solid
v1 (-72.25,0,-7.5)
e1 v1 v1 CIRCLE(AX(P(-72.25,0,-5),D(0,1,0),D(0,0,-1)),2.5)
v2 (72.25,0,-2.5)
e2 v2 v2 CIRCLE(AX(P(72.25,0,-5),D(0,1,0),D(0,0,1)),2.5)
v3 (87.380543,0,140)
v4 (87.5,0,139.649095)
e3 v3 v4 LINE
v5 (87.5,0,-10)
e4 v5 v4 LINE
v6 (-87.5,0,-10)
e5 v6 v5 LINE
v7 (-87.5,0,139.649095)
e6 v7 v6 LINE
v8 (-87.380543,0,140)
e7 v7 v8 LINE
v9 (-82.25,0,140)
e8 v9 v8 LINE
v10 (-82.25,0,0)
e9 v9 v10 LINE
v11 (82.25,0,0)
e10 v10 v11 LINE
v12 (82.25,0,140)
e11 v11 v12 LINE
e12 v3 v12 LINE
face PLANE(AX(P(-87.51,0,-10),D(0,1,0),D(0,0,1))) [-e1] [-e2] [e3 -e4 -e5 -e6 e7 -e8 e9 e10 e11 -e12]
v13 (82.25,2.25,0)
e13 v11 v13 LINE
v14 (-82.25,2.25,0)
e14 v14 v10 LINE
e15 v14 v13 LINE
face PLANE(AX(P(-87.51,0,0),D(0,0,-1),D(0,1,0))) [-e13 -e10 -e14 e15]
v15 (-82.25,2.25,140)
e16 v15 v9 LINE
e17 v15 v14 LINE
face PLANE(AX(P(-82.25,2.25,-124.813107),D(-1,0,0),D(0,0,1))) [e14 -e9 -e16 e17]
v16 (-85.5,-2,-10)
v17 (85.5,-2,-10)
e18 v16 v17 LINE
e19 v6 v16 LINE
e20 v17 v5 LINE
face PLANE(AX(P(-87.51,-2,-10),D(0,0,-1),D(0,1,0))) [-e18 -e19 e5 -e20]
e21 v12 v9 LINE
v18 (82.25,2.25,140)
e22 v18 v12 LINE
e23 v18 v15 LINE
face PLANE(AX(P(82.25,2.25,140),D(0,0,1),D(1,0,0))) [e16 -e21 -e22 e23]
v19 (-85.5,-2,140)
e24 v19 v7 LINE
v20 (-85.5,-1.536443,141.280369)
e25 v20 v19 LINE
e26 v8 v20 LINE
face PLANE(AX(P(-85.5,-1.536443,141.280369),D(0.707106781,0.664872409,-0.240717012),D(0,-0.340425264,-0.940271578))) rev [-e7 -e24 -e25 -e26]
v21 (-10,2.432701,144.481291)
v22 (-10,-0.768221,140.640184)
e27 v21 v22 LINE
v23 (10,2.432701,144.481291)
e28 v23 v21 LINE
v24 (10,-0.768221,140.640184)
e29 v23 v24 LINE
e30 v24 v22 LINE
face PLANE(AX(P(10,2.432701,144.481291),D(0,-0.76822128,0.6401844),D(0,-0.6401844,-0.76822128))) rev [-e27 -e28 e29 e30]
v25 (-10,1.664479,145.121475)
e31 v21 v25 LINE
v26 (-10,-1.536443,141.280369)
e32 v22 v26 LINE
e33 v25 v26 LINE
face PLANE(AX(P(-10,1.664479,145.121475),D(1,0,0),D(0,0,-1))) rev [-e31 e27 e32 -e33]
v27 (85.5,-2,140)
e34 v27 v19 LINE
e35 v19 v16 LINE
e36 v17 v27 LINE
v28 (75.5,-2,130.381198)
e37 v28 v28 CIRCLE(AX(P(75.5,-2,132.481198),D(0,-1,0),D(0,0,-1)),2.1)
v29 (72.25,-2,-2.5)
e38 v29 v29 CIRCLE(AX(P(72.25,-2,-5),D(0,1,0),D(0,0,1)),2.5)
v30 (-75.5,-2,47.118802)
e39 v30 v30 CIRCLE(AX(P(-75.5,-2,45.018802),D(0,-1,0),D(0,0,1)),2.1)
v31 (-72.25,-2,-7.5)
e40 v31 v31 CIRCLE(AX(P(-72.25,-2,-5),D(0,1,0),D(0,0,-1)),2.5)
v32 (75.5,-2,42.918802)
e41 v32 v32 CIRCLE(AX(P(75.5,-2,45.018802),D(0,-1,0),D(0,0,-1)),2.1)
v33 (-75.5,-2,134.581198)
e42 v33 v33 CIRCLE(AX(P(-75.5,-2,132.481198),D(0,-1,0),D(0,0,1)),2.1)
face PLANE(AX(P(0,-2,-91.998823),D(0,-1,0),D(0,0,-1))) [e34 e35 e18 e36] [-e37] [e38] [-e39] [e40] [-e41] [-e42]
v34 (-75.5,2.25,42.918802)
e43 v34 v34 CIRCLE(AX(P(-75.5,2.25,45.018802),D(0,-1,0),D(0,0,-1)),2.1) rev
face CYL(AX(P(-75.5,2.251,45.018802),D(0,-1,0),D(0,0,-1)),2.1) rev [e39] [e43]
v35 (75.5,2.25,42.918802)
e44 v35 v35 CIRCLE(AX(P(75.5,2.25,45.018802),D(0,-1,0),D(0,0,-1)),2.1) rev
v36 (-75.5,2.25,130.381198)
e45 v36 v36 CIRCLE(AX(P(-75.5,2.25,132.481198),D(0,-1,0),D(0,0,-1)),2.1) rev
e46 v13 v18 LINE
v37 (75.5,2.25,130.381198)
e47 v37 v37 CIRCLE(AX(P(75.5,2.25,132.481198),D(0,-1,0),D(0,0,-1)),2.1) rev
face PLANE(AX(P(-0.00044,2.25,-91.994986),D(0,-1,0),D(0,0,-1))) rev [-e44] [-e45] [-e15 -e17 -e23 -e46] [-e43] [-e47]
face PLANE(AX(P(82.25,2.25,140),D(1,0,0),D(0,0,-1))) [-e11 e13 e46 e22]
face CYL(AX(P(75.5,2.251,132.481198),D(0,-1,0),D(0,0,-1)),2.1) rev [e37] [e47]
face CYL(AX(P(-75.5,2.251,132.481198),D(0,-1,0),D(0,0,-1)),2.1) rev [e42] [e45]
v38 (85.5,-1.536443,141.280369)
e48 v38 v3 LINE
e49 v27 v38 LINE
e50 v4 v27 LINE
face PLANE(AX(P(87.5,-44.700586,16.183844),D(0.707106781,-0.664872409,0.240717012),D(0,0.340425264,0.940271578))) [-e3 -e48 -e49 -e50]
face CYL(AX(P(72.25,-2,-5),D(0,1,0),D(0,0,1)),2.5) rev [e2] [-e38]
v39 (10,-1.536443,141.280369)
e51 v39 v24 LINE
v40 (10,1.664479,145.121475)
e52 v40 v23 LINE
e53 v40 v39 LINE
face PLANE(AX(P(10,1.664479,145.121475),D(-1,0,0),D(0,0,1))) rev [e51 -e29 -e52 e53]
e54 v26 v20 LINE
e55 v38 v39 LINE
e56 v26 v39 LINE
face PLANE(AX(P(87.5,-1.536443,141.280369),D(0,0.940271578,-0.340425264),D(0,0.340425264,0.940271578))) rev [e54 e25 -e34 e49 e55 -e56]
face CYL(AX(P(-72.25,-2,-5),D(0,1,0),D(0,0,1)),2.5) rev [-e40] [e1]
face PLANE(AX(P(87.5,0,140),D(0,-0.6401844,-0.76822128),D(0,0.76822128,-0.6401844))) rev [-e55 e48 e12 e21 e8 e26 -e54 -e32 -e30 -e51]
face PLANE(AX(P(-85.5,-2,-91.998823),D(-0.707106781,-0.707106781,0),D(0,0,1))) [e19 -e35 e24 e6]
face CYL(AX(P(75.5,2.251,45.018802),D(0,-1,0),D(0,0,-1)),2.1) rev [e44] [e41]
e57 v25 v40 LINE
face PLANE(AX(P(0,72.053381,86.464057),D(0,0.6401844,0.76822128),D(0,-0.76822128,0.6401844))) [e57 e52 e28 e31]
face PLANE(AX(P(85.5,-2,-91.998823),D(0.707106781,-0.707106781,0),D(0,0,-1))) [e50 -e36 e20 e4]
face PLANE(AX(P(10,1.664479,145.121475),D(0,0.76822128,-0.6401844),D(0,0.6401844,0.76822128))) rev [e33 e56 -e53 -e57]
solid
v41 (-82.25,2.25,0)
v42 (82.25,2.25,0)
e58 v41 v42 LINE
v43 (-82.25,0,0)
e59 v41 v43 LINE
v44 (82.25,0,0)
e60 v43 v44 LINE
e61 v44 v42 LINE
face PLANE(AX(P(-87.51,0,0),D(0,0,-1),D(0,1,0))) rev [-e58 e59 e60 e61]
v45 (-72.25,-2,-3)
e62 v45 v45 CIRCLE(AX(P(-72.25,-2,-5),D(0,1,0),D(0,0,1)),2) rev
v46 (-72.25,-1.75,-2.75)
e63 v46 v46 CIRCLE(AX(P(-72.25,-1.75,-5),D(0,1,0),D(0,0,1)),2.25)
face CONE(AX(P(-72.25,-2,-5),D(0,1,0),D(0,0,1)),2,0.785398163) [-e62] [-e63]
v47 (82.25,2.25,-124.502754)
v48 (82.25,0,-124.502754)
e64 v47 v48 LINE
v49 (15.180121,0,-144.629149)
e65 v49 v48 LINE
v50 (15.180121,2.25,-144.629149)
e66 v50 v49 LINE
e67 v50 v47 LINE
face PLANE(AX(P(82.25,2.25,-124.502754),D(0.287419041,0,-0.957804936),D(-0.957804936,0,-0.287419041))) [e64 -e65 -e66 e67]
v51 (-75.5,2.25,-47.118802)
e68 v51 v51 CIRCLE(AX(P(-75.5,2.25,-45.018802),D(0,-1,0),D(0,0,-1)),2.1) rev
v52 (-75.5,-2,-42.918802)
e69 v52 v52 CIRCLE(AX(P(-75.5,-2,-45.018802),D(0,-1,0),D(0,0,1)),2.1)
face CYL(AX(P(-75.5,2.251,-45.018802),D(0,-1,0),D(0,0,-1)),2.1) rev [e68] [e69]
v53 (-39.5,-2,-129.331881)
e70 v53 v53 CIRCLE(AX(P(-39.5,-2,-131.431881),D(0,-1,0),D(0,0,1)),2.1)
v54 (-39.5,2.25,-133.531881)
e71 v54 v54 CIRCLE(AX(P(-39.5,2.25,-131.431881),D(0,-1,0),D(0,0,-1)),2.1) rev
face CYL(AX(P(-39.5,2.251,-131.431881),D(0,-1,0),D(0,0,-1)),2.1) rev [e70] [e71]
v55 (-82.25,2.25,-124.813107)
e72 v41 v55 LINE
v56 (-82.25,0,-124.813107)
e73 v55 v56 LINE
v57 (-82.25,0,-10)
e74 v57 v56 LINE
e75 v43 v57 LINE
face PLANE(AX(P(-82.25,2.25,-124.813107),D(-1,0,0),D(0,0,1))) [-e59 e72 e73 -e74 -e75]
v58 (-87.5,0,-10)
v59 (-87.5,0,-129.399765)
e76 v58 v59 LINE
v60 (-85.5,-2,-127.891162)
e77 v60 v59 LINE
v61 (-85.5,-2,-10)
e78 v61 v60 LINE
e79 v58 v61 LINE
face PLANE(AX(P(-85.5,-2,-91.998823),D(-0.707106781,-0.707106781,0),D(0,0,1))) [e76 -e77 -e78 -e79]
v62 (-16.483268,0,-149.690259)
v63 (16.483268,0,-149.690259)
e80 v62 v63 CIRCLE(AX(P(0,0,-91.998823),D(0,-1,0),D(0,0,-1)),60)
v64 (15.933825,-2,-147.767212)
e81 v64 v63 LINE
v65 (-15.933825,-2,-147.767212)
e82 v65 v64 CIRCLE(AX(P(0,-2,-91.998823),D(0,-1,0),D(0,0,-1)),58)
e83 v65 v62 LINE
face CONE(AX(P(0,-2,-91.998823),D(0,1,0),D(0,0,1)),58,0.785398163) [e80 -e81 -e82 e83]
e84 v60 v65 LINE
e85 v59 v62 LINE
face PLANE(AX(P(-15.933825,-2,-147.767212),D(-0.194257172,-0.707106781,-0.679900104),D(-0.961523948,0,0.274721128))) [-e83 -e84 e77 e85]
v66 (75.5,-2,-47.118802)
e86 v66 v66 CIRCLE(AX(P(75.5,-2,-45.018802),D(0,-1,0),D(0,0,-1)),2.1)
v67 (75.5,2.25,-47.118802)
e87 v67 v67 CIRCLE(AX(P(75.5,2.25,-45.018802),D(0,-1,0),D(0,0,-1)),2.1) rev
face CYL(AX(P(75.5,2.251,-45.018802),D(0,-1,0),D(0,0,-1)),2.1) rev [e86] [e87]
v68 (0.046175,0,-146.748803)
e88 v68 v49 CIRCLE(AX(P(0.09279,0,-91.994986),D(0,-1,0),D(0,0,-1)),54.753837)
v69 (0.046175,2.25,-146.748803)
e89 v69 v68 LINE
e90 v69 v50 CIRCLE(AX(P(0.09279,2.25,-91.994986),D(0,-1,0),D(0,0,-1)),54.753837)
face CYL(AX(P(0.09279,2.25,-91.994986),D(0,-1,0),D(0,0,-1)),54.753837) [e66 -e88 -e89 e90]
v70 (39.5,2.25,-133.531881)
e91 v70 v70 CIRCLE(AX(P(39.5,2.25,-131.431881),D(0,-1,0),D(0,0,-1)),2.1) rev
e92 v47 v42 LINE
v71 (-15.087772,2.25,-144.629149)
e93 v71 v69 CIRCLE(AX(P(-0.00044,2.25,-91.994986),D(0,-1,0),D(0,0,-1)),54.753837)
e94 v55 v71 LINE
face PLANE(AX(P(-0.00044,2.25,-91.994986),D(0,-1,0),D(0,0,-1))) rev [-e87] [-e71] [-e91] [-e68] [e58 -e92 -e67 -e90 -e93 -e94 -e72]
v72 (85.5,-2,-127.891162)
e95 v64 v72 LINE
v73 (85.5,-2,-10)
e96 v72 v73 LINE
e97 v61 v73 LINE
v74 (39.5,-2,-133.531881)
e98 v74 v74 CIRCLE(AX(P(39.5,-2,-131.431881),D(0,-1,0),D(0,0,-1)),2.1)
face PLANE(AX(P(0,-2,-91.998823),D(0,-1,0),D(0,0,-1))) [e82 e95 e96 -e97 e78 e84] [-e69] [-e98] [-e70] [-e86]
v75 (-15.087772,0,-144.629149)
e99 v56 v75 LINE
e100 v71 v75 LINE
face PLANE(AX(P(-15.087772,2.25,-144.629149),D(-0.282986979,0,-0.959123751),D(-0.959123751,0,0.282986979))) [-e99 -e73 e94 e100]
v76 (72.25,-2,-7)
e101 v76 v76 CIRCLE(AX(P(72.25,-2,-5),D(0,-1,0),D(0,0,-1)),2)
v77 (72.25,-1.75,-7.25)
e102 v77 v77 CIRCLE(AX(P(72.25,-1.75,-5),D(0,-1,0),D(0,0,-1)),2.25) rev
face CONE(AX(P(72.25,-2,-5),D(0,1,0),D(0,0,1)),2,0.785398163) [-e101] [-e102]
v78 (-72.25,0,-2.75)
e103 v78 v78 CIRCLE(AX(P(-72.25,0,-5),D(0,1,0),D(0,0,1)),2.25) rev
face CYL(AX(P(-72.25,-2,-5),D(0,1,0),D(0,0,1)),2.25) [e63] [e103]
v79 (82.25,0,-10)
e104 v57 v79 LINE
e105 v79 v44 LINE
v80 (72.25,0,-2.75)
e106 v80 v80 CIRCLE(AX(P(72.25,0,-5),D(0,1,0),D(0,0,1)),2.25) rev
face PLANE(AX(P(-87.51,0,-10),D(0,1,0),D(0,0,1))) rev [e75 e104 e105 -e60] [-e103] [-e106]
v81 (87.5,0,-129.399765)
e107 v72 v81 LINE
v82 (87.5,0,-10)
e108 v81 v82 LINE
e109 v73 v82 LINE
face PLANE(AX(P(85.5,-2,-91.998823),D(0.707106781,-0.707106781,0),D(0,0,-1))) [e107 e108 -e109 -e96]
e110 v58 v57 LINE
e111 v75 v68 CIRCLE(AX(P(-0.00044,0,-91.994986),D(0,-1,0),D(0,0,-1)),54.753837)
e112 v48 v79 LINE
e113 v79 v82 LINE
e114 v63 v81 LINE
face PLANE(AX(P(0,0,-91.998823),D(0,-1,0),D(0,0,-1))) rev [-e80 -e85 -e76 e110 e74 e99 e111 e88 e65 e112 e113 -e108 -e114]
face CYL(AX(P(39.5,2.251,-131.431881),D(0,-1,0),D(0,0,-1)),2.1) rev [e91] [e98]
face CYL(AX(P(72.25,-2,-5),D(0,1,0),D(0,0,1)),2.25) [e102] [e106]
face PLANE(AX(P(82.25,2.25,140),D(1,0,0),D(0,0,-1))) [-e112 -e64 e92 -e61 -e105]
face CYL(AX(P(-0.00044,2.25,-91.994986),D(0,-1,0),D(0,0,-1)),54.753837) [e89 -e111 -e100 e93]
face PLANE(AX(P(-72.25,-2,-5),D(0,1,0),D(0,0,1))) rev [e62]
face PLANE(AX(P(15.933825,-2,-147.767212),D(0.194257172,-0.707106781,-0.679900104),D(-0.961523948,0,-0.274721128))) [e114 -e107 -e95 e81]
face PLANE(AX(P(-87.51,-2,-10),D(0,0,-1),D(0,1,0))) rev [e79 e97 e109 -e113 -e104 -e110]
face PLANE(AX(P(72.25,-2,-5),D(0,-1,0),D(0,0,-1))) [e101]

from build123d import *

# Parameters (mm, degrees)
BOSS_EXTRUDE1_DEPTH      = 2.25
BOSS_EXTRUDE2_DEPTH      = 2
CHAMFER1_SIZE            = 2
CUT_EXTRUDE1_REACH       = 177.436
SKETCH5_R                = 2.1
SPLIT1_SURFACE_1_BACK    = 341.45
SPLIT1_SURFACE_1_DEPTH   = 682.9
SPLIT1_SURFACE_2_BACK    = 341.45
SPLIT1_SURFACE_2_DEPTH   = 682.9
SKETCH7_R                = 2.25
BOSS_EXTRUDE3_DEPTH      = 2
CHAMFER2_SIZE            = 0.25
SKETCH9_R                = 2.5
CUT_EXTRUDE2_DEPTH       = 2
BOSS_EXTRUDE5_DEPTH      = 87.5
BOSS_EXTRUDE5_DEPTH_BACK = 87.5
CHAMFER3_SIZE            = 2
SKETCH13_W               = 20
SKETCH13_H               = 1
BOSS_EXTRUDE6_DEPTH      = 5


# Some blends are built 0.0001 mm under size
with BuildPart() as part:
    # Sketch3 → Boss-Extrude1 (new body)
    with BuildSketch(Plane.XZ):
        with BuildLine():
            Line((82.25, 140), (82.25, -124.502754064))
            Line((82.25, -124.502754064), (15.180121042, -144.629148882))
            ThreePointArc((15.180121042, -144.629148882), (7.687460253, -146.219552794), (0.046174732, -146.748803111))
            ThreePointArc((0.046174732, -146.748803111), (-7.595110788, -146.219552794), (-15.087771577, -144.629148882))
            Line((-15.087771577, -144.629148882), (-82.25, -124.813107271))
            Line((-82.25, -124.813107271), (-82.25, 140))
            Line((-82.25, 140), (82.25, 140))
        make_face()
    extrude(amount=-BOSS_EXTRUDE1_DEPTH)

    # Sketch4 → Boss-Extrude2 (add)
    with BuildSketch(Plane.XZ):
        with BuildLine():
            Line((87.5, 140), (-87.5, 140))
            Line((-87.5, 140), (-87.5, -129.399764523))
            Line((-87.5, -129.399764523), (-16.483267674, -149.690259473))
            ThreePointArc((-16.483267674, -149.690259473), (0, -151.998822615), (16.483267674, -149.690259473))
            Line((16.483267674, -149.690259473), (87.5, -129.399764523))
            Line((87.5, -129.399764523), (87.5, 140))
        make_face()
    extrude(amount=BOSS_EXTRUDE2_DEPTH)

    # Chamfer1
    chamfer1_edges = [part.edges().sort_by_distance(p)[0] for p in [
        (87.5, -2, 5.300117739),
        (51.991633837, -2, -139.545011998),
        (0, -2, -151.998822615),
        (-51.991633837, -2, -139.545011998),
        (-87.5, -2, 5.300117739),
    ]]
    chamfer(chamfer1_edges, length=CHAMFER1_SIZE - 0.0001)  # a hair under: the kernel refuses the full size

    # Sketch5 → Cut-Extrude1 (cut, up to next)
    with BuildSketch(Plane.XZ.offset(2), mode=Mode.PRIVATE) as cut_extrude1_sk1:
        with Locations(Location((39.5, -131.431881025, 0), (0, 0, 270))):
            Circle(SKETCH5_R)
    cut_extrude1_tool1 = extrude(cut_extrude1_sk1.sketch, amount=-CUT_EXTRUDE1_REACH, mode=Mode.PRIVATE) & part.part
    # Sketch5 → Cut-Extrude1 (cut, up to next)
    with BuildSketch(Plane.XZ.offset(2), mode=Mode.PRIVATE) as cut_extrude1_sk2:
        with Locations(Location((75.5, -45.018802154, 0), (0, 0, 270))):
            Circle(SKETCH5_R)
    cut_extrude1_tool2 = extrude(cut_extrude1_sk2.sketch, amount=-CUT_EXTRUDE1_REACH, mode=Mode.PRIVATE) & part.part
    # Sketch5 → Cut-Extrude1 (cut, up to next)
    with BuildSketch(Plane.XZ.offset(2), mode=Mode.PRIVATE) as cut_extrude1_sk3:
        with Locations(Location((75.5, 45.018802154, 0), (0, 0, 270))):
            Circle(SKETCH5_R)
    cut_extrude1_tool3 = extrude(cut_extrude1_sk3.sketch, amount=-CUT_EXTRUDE1_REACH, mode=Mode.PRIVATE) & part.part
    # Sketch5 → Cut-Extrude1 (cut, up to next)
    with BuildSketch(Plane.XZ.offset(2), mode=Mode.PRIVATE) as cut_extrude1_sk4:
        with Locations(Location((75.5, 132.481197846, 0), (0, 0, 270))):
            Circle(SKETCH5_R)
    cut_extrude1_tool4 = extrude(cut_extrude1_sk4.sketch, amount=-CUT_EXTRUDE1_REACH, mode=Mode.PRIVATE) & part.part
    # Sketch5 → Cut-Extrude1 (cut, up to next)
    with BuildSketch(Plane.XZ.offset(2), mode=Mode.PRIVATE) as cut_extrude1_sk5:
        with Locations(Location((-75.5, 132.481197846, 0), (0, 0, 270))):
            Circle(SKETCH5_R)
    cut_extrude1_tool5 = extrude(cut_extrude1_sk5.sketch, amount=-CUT_EXTRUDE1_REACH, mode=Mode.PRIVATE) & part.part
    # Sketch5 → Cut-Extrude1 (cut, up to next)
    with BuildSketch(Plane.XZ.offset(2), mode=Mode.PRIVATE) as cut_extrude1_sk6:
        with Locations(Location((-75.5, 45.018802154, 0), (0, 0, 270))):
            Circle(SKETCH5_R)
    cut_extrude1_tool6 = extrude(cut_extrude1_sk6.sketch, amount=-CUT_EXTRUDE1_REACH, mode=Mode.PRIVATE) & part.part
    # Sketch5 → Cut-Extrude1 (cut, up to next)
    with BuildSketch(Plane.XZ.offset(2), mode=Mode.PRIVATE) as cut_extrude1_sk7:
        with Locations(Location((-75.5, -45.018802154, 0), (0, 0, 270))):
            Circle(SKETCH5_R)
    cut_extrude1_tool7 = extrude(cut_extrude1_sk7.sketch, amount=-CUT_EXTRUDE1_REACH, mode=Mode.PRIVATE) & part.part
    # Sketch5 → Cut-Extrude1 (cut, up to next)
    with BuildSketch(Plane.XZ.offset(2), mode=Mode.PRIVATE) as cut_extrude1_sk8:
        with Locations(Location((-39.5, -131.431881025, 0), (0, 0, 270))):
            Circle(SKETCH5_R)
    cut_extrude1_tool8 = extrude(cut_extrude1_sk8.sketch, amount=-CUT_EXTRUDE1_REACH, mode=Mode.PRIVATE) & part.part
    add(cut_extrude1_tool1.solids().sort_by_distance((39.5, -2, -131.431881))[0], mode=Mode.SUBTRACT)
    add(cut_extrude1_tool2.solids().sort_by_distance((75.5, -2, -45.018802))[0], mode=Mode.SUBTRACT)
    add(cut_extrude1_tool3.solids().sort_by_distance((75.5, -2, 45.018802))[0], mode=Mode.SUBTRACT)
    add(cut_extrude1_tool4.solids().sort_by_distance((75.5, -2, 132.481198))[0], mode=Mode.SUBTRACT)
    add(cut_extrude1_tool5.solids().sort_by_distance((-75.5, -2, 132.481198))[0], mode=Mode.SUBTRACT)
    add(cut_extrude1_tool6.solids().sort_by_distance((-75.5, -2, 45.018802))[0], mode=Mode.SUBTRACT)
    add(cut_extrude1_tool7.solids().sort_by_distance((-75.5, -2, -45.018802))[0], mode=Mode.SUBTRACT)
    add(cut_extrude1_tool8.solids().sort_by_distance((-39.5, -2, -131.431881))[0], mode=Mode.SUBTRACT)


with BuildPart() as body_2:
    # Split1: the piece behind the surface
    add(part.part)
    # Split1 surface: a surface, the sketch's curves swept straight by 682.9 mm
    with BuildLine(Plane(origin=(0, 0, 0), x_dir=(0, 0, -1), z_dir=(1, 0, 0)).offset(-SPLIT1_SURFACE_1_BACK), mode=Mode.PRIVATE) as split1_surface_1_path:
        Line((10, -2), (10, 0))
        Line((10, 0), (0, 0))
        Line((0, 0), (0, 2.25))
    split1_surface_1 = Shell.extrude(split1_surface_1_path.wire(), (1 * SPLIT1_SURFACE_1_DEPTH, 0 * SPLIT1_SURFACE_1_DEPTH, 0 * SPLIT1_SURFACE_1_DEPTH))
    split(bisect_by=split1_surface_1, keep=Keep.BOTTOM)

    # Sketch7 → Boss-Extrude3 (add)
    with BuildSketch(Plane.XZ):
        with Locations(Location((72.25, -5, 0), (0, 0, 90))):
            Circle(SKETCH7_R)
        with Locations(Location((-72.25, -5, 0), (0, 0, 90))):
            Circle(SKETCH7_R)
    extrude(amount=BOSS_EXTRUDE3_DEPTH)

    # Chamfer2
    chamfer2_edges = [body_2.edges().sort_by_distance(p)[0] for p in [
        (72.25, -2, -7.25),
        (-72.25, -2, -7.25),
    ]]
    chamfer(chamfer2_edges, length=CHAMFER2_SIZE)


with BuildPart() as part_1:
    add(part.part)

    # Split1: split by a surface, the side it looks to stays
    # Split1 surface: a surface, the sketch's curves swept straight by 682.9 mm
    with BuildLine(Plane(origin=(0, 0, 0), x_dir=(0, 0, -1), z_dir=(1, 0, 0)).offset(-SPLIT1_SURFACE_2_BACK), mode=Mode.PRIVATE) as split1_surface_2_path:
        Line((10, -2), (10, 0))
        Line((10, 0), (0, 0))
        Line((0, 0), (0, 2.25))
    split1_surface_2 = Shell.extrude(split1_surface_2_path.wire(), (1 * SPLIT1_SURFACE_2_DEPTH, 0 * SPLIT1_SURFACE_2_DEPTH, 0 * SPLIT1_SURFACE_2_DEPTH))
    split(bisect_by=split1_surface_2, keep=Keep.TOP)

    # Sketch9 → Cut-Extrude2 (cut)
    with BuildSketch(Plane(origin=(0, 0, 0), x_dir=(1, 0, 0), z_dir=(0, 1, 0))):
        with Locations(Location((72.25, 5, 0), (0, 0, 270))):
            Circle(SKETCH9_R)
        with Locations(Location((-72.25, 5, 0), (0, 0, 90))):
            Circle(SKETCH9_R)
    extrude(amount=-CUT_EXTRUDE2_DEPTH, mode=Mode.SUBTRACT)

    # Sketch12 → Boss-Extrude5 (add, two sides: drawn at the far end of the back side and taken through both)
    with BuildSketch(Plane(origin=(0, 0, 0), x_dir=(0, 0, -1), z_dir=(1, 0, 0)).offset(-BOSS_EXTRUDE5_DEPTH_BACK)):
        Polygon((-140, -2), (-140, 0), (-141.280368799, -1.536442559), align=None)
    extrude(amount=BOSS_EXTRUDE5_DEPTH + BOSS_EXTRUDE5_DEPTH_BACK)

    # Chamfer3
    # the kernel refuses this chamfer: 2 mm, written as the material it takes off along each edge
    with BuildSketch(Plane(origin=(87.5, 0.21448916, 146.11652964), x_dir=(0.027495876610589054, 0.9399160769008188, -0.34029655471777764), z_dir=(0, -0.34042526375297005, -0.9402715776831292)), Plane(origin=(-87.5, 0.21448916, 146.11652964), x_dir=(0.999621916911297, -0.025853591280412175, 0.009360291047276351), z_dir=(0, -0.34042526375297005, -0.9402715776831292))) as chamfer3_piece_1:
        Polygon((CHAMFER3_SIZE * 0.999621916911, -CHAMFER3_SIZE * 0.0274958766106), (-CHAMFER3_SIZE * 0.0274958766106, -CHAMFER3_SIZE * 0.999621916911), (0, 0), align=None)
    extrude(amount=11.648433007, mode=Mode.SUBTRACT)

    # Sketch13 → Boss-Extrude6 (add)
    with BuildSketch(Plane(origin=(0, 68.852459016, 82.62295082), x_dir=(1, 0, 0), z_dir=(0, 0.6401843996644769, 0.7682212795973784))):
        with Locations((0, -91.125815953)):
            Rectangle(SKETCH13_W, SKETCH13_H)
    extrude(amount=BOSS_EXTRUDE6_DEPTH)


solid = Compound([body_2.part, part_1.part])
